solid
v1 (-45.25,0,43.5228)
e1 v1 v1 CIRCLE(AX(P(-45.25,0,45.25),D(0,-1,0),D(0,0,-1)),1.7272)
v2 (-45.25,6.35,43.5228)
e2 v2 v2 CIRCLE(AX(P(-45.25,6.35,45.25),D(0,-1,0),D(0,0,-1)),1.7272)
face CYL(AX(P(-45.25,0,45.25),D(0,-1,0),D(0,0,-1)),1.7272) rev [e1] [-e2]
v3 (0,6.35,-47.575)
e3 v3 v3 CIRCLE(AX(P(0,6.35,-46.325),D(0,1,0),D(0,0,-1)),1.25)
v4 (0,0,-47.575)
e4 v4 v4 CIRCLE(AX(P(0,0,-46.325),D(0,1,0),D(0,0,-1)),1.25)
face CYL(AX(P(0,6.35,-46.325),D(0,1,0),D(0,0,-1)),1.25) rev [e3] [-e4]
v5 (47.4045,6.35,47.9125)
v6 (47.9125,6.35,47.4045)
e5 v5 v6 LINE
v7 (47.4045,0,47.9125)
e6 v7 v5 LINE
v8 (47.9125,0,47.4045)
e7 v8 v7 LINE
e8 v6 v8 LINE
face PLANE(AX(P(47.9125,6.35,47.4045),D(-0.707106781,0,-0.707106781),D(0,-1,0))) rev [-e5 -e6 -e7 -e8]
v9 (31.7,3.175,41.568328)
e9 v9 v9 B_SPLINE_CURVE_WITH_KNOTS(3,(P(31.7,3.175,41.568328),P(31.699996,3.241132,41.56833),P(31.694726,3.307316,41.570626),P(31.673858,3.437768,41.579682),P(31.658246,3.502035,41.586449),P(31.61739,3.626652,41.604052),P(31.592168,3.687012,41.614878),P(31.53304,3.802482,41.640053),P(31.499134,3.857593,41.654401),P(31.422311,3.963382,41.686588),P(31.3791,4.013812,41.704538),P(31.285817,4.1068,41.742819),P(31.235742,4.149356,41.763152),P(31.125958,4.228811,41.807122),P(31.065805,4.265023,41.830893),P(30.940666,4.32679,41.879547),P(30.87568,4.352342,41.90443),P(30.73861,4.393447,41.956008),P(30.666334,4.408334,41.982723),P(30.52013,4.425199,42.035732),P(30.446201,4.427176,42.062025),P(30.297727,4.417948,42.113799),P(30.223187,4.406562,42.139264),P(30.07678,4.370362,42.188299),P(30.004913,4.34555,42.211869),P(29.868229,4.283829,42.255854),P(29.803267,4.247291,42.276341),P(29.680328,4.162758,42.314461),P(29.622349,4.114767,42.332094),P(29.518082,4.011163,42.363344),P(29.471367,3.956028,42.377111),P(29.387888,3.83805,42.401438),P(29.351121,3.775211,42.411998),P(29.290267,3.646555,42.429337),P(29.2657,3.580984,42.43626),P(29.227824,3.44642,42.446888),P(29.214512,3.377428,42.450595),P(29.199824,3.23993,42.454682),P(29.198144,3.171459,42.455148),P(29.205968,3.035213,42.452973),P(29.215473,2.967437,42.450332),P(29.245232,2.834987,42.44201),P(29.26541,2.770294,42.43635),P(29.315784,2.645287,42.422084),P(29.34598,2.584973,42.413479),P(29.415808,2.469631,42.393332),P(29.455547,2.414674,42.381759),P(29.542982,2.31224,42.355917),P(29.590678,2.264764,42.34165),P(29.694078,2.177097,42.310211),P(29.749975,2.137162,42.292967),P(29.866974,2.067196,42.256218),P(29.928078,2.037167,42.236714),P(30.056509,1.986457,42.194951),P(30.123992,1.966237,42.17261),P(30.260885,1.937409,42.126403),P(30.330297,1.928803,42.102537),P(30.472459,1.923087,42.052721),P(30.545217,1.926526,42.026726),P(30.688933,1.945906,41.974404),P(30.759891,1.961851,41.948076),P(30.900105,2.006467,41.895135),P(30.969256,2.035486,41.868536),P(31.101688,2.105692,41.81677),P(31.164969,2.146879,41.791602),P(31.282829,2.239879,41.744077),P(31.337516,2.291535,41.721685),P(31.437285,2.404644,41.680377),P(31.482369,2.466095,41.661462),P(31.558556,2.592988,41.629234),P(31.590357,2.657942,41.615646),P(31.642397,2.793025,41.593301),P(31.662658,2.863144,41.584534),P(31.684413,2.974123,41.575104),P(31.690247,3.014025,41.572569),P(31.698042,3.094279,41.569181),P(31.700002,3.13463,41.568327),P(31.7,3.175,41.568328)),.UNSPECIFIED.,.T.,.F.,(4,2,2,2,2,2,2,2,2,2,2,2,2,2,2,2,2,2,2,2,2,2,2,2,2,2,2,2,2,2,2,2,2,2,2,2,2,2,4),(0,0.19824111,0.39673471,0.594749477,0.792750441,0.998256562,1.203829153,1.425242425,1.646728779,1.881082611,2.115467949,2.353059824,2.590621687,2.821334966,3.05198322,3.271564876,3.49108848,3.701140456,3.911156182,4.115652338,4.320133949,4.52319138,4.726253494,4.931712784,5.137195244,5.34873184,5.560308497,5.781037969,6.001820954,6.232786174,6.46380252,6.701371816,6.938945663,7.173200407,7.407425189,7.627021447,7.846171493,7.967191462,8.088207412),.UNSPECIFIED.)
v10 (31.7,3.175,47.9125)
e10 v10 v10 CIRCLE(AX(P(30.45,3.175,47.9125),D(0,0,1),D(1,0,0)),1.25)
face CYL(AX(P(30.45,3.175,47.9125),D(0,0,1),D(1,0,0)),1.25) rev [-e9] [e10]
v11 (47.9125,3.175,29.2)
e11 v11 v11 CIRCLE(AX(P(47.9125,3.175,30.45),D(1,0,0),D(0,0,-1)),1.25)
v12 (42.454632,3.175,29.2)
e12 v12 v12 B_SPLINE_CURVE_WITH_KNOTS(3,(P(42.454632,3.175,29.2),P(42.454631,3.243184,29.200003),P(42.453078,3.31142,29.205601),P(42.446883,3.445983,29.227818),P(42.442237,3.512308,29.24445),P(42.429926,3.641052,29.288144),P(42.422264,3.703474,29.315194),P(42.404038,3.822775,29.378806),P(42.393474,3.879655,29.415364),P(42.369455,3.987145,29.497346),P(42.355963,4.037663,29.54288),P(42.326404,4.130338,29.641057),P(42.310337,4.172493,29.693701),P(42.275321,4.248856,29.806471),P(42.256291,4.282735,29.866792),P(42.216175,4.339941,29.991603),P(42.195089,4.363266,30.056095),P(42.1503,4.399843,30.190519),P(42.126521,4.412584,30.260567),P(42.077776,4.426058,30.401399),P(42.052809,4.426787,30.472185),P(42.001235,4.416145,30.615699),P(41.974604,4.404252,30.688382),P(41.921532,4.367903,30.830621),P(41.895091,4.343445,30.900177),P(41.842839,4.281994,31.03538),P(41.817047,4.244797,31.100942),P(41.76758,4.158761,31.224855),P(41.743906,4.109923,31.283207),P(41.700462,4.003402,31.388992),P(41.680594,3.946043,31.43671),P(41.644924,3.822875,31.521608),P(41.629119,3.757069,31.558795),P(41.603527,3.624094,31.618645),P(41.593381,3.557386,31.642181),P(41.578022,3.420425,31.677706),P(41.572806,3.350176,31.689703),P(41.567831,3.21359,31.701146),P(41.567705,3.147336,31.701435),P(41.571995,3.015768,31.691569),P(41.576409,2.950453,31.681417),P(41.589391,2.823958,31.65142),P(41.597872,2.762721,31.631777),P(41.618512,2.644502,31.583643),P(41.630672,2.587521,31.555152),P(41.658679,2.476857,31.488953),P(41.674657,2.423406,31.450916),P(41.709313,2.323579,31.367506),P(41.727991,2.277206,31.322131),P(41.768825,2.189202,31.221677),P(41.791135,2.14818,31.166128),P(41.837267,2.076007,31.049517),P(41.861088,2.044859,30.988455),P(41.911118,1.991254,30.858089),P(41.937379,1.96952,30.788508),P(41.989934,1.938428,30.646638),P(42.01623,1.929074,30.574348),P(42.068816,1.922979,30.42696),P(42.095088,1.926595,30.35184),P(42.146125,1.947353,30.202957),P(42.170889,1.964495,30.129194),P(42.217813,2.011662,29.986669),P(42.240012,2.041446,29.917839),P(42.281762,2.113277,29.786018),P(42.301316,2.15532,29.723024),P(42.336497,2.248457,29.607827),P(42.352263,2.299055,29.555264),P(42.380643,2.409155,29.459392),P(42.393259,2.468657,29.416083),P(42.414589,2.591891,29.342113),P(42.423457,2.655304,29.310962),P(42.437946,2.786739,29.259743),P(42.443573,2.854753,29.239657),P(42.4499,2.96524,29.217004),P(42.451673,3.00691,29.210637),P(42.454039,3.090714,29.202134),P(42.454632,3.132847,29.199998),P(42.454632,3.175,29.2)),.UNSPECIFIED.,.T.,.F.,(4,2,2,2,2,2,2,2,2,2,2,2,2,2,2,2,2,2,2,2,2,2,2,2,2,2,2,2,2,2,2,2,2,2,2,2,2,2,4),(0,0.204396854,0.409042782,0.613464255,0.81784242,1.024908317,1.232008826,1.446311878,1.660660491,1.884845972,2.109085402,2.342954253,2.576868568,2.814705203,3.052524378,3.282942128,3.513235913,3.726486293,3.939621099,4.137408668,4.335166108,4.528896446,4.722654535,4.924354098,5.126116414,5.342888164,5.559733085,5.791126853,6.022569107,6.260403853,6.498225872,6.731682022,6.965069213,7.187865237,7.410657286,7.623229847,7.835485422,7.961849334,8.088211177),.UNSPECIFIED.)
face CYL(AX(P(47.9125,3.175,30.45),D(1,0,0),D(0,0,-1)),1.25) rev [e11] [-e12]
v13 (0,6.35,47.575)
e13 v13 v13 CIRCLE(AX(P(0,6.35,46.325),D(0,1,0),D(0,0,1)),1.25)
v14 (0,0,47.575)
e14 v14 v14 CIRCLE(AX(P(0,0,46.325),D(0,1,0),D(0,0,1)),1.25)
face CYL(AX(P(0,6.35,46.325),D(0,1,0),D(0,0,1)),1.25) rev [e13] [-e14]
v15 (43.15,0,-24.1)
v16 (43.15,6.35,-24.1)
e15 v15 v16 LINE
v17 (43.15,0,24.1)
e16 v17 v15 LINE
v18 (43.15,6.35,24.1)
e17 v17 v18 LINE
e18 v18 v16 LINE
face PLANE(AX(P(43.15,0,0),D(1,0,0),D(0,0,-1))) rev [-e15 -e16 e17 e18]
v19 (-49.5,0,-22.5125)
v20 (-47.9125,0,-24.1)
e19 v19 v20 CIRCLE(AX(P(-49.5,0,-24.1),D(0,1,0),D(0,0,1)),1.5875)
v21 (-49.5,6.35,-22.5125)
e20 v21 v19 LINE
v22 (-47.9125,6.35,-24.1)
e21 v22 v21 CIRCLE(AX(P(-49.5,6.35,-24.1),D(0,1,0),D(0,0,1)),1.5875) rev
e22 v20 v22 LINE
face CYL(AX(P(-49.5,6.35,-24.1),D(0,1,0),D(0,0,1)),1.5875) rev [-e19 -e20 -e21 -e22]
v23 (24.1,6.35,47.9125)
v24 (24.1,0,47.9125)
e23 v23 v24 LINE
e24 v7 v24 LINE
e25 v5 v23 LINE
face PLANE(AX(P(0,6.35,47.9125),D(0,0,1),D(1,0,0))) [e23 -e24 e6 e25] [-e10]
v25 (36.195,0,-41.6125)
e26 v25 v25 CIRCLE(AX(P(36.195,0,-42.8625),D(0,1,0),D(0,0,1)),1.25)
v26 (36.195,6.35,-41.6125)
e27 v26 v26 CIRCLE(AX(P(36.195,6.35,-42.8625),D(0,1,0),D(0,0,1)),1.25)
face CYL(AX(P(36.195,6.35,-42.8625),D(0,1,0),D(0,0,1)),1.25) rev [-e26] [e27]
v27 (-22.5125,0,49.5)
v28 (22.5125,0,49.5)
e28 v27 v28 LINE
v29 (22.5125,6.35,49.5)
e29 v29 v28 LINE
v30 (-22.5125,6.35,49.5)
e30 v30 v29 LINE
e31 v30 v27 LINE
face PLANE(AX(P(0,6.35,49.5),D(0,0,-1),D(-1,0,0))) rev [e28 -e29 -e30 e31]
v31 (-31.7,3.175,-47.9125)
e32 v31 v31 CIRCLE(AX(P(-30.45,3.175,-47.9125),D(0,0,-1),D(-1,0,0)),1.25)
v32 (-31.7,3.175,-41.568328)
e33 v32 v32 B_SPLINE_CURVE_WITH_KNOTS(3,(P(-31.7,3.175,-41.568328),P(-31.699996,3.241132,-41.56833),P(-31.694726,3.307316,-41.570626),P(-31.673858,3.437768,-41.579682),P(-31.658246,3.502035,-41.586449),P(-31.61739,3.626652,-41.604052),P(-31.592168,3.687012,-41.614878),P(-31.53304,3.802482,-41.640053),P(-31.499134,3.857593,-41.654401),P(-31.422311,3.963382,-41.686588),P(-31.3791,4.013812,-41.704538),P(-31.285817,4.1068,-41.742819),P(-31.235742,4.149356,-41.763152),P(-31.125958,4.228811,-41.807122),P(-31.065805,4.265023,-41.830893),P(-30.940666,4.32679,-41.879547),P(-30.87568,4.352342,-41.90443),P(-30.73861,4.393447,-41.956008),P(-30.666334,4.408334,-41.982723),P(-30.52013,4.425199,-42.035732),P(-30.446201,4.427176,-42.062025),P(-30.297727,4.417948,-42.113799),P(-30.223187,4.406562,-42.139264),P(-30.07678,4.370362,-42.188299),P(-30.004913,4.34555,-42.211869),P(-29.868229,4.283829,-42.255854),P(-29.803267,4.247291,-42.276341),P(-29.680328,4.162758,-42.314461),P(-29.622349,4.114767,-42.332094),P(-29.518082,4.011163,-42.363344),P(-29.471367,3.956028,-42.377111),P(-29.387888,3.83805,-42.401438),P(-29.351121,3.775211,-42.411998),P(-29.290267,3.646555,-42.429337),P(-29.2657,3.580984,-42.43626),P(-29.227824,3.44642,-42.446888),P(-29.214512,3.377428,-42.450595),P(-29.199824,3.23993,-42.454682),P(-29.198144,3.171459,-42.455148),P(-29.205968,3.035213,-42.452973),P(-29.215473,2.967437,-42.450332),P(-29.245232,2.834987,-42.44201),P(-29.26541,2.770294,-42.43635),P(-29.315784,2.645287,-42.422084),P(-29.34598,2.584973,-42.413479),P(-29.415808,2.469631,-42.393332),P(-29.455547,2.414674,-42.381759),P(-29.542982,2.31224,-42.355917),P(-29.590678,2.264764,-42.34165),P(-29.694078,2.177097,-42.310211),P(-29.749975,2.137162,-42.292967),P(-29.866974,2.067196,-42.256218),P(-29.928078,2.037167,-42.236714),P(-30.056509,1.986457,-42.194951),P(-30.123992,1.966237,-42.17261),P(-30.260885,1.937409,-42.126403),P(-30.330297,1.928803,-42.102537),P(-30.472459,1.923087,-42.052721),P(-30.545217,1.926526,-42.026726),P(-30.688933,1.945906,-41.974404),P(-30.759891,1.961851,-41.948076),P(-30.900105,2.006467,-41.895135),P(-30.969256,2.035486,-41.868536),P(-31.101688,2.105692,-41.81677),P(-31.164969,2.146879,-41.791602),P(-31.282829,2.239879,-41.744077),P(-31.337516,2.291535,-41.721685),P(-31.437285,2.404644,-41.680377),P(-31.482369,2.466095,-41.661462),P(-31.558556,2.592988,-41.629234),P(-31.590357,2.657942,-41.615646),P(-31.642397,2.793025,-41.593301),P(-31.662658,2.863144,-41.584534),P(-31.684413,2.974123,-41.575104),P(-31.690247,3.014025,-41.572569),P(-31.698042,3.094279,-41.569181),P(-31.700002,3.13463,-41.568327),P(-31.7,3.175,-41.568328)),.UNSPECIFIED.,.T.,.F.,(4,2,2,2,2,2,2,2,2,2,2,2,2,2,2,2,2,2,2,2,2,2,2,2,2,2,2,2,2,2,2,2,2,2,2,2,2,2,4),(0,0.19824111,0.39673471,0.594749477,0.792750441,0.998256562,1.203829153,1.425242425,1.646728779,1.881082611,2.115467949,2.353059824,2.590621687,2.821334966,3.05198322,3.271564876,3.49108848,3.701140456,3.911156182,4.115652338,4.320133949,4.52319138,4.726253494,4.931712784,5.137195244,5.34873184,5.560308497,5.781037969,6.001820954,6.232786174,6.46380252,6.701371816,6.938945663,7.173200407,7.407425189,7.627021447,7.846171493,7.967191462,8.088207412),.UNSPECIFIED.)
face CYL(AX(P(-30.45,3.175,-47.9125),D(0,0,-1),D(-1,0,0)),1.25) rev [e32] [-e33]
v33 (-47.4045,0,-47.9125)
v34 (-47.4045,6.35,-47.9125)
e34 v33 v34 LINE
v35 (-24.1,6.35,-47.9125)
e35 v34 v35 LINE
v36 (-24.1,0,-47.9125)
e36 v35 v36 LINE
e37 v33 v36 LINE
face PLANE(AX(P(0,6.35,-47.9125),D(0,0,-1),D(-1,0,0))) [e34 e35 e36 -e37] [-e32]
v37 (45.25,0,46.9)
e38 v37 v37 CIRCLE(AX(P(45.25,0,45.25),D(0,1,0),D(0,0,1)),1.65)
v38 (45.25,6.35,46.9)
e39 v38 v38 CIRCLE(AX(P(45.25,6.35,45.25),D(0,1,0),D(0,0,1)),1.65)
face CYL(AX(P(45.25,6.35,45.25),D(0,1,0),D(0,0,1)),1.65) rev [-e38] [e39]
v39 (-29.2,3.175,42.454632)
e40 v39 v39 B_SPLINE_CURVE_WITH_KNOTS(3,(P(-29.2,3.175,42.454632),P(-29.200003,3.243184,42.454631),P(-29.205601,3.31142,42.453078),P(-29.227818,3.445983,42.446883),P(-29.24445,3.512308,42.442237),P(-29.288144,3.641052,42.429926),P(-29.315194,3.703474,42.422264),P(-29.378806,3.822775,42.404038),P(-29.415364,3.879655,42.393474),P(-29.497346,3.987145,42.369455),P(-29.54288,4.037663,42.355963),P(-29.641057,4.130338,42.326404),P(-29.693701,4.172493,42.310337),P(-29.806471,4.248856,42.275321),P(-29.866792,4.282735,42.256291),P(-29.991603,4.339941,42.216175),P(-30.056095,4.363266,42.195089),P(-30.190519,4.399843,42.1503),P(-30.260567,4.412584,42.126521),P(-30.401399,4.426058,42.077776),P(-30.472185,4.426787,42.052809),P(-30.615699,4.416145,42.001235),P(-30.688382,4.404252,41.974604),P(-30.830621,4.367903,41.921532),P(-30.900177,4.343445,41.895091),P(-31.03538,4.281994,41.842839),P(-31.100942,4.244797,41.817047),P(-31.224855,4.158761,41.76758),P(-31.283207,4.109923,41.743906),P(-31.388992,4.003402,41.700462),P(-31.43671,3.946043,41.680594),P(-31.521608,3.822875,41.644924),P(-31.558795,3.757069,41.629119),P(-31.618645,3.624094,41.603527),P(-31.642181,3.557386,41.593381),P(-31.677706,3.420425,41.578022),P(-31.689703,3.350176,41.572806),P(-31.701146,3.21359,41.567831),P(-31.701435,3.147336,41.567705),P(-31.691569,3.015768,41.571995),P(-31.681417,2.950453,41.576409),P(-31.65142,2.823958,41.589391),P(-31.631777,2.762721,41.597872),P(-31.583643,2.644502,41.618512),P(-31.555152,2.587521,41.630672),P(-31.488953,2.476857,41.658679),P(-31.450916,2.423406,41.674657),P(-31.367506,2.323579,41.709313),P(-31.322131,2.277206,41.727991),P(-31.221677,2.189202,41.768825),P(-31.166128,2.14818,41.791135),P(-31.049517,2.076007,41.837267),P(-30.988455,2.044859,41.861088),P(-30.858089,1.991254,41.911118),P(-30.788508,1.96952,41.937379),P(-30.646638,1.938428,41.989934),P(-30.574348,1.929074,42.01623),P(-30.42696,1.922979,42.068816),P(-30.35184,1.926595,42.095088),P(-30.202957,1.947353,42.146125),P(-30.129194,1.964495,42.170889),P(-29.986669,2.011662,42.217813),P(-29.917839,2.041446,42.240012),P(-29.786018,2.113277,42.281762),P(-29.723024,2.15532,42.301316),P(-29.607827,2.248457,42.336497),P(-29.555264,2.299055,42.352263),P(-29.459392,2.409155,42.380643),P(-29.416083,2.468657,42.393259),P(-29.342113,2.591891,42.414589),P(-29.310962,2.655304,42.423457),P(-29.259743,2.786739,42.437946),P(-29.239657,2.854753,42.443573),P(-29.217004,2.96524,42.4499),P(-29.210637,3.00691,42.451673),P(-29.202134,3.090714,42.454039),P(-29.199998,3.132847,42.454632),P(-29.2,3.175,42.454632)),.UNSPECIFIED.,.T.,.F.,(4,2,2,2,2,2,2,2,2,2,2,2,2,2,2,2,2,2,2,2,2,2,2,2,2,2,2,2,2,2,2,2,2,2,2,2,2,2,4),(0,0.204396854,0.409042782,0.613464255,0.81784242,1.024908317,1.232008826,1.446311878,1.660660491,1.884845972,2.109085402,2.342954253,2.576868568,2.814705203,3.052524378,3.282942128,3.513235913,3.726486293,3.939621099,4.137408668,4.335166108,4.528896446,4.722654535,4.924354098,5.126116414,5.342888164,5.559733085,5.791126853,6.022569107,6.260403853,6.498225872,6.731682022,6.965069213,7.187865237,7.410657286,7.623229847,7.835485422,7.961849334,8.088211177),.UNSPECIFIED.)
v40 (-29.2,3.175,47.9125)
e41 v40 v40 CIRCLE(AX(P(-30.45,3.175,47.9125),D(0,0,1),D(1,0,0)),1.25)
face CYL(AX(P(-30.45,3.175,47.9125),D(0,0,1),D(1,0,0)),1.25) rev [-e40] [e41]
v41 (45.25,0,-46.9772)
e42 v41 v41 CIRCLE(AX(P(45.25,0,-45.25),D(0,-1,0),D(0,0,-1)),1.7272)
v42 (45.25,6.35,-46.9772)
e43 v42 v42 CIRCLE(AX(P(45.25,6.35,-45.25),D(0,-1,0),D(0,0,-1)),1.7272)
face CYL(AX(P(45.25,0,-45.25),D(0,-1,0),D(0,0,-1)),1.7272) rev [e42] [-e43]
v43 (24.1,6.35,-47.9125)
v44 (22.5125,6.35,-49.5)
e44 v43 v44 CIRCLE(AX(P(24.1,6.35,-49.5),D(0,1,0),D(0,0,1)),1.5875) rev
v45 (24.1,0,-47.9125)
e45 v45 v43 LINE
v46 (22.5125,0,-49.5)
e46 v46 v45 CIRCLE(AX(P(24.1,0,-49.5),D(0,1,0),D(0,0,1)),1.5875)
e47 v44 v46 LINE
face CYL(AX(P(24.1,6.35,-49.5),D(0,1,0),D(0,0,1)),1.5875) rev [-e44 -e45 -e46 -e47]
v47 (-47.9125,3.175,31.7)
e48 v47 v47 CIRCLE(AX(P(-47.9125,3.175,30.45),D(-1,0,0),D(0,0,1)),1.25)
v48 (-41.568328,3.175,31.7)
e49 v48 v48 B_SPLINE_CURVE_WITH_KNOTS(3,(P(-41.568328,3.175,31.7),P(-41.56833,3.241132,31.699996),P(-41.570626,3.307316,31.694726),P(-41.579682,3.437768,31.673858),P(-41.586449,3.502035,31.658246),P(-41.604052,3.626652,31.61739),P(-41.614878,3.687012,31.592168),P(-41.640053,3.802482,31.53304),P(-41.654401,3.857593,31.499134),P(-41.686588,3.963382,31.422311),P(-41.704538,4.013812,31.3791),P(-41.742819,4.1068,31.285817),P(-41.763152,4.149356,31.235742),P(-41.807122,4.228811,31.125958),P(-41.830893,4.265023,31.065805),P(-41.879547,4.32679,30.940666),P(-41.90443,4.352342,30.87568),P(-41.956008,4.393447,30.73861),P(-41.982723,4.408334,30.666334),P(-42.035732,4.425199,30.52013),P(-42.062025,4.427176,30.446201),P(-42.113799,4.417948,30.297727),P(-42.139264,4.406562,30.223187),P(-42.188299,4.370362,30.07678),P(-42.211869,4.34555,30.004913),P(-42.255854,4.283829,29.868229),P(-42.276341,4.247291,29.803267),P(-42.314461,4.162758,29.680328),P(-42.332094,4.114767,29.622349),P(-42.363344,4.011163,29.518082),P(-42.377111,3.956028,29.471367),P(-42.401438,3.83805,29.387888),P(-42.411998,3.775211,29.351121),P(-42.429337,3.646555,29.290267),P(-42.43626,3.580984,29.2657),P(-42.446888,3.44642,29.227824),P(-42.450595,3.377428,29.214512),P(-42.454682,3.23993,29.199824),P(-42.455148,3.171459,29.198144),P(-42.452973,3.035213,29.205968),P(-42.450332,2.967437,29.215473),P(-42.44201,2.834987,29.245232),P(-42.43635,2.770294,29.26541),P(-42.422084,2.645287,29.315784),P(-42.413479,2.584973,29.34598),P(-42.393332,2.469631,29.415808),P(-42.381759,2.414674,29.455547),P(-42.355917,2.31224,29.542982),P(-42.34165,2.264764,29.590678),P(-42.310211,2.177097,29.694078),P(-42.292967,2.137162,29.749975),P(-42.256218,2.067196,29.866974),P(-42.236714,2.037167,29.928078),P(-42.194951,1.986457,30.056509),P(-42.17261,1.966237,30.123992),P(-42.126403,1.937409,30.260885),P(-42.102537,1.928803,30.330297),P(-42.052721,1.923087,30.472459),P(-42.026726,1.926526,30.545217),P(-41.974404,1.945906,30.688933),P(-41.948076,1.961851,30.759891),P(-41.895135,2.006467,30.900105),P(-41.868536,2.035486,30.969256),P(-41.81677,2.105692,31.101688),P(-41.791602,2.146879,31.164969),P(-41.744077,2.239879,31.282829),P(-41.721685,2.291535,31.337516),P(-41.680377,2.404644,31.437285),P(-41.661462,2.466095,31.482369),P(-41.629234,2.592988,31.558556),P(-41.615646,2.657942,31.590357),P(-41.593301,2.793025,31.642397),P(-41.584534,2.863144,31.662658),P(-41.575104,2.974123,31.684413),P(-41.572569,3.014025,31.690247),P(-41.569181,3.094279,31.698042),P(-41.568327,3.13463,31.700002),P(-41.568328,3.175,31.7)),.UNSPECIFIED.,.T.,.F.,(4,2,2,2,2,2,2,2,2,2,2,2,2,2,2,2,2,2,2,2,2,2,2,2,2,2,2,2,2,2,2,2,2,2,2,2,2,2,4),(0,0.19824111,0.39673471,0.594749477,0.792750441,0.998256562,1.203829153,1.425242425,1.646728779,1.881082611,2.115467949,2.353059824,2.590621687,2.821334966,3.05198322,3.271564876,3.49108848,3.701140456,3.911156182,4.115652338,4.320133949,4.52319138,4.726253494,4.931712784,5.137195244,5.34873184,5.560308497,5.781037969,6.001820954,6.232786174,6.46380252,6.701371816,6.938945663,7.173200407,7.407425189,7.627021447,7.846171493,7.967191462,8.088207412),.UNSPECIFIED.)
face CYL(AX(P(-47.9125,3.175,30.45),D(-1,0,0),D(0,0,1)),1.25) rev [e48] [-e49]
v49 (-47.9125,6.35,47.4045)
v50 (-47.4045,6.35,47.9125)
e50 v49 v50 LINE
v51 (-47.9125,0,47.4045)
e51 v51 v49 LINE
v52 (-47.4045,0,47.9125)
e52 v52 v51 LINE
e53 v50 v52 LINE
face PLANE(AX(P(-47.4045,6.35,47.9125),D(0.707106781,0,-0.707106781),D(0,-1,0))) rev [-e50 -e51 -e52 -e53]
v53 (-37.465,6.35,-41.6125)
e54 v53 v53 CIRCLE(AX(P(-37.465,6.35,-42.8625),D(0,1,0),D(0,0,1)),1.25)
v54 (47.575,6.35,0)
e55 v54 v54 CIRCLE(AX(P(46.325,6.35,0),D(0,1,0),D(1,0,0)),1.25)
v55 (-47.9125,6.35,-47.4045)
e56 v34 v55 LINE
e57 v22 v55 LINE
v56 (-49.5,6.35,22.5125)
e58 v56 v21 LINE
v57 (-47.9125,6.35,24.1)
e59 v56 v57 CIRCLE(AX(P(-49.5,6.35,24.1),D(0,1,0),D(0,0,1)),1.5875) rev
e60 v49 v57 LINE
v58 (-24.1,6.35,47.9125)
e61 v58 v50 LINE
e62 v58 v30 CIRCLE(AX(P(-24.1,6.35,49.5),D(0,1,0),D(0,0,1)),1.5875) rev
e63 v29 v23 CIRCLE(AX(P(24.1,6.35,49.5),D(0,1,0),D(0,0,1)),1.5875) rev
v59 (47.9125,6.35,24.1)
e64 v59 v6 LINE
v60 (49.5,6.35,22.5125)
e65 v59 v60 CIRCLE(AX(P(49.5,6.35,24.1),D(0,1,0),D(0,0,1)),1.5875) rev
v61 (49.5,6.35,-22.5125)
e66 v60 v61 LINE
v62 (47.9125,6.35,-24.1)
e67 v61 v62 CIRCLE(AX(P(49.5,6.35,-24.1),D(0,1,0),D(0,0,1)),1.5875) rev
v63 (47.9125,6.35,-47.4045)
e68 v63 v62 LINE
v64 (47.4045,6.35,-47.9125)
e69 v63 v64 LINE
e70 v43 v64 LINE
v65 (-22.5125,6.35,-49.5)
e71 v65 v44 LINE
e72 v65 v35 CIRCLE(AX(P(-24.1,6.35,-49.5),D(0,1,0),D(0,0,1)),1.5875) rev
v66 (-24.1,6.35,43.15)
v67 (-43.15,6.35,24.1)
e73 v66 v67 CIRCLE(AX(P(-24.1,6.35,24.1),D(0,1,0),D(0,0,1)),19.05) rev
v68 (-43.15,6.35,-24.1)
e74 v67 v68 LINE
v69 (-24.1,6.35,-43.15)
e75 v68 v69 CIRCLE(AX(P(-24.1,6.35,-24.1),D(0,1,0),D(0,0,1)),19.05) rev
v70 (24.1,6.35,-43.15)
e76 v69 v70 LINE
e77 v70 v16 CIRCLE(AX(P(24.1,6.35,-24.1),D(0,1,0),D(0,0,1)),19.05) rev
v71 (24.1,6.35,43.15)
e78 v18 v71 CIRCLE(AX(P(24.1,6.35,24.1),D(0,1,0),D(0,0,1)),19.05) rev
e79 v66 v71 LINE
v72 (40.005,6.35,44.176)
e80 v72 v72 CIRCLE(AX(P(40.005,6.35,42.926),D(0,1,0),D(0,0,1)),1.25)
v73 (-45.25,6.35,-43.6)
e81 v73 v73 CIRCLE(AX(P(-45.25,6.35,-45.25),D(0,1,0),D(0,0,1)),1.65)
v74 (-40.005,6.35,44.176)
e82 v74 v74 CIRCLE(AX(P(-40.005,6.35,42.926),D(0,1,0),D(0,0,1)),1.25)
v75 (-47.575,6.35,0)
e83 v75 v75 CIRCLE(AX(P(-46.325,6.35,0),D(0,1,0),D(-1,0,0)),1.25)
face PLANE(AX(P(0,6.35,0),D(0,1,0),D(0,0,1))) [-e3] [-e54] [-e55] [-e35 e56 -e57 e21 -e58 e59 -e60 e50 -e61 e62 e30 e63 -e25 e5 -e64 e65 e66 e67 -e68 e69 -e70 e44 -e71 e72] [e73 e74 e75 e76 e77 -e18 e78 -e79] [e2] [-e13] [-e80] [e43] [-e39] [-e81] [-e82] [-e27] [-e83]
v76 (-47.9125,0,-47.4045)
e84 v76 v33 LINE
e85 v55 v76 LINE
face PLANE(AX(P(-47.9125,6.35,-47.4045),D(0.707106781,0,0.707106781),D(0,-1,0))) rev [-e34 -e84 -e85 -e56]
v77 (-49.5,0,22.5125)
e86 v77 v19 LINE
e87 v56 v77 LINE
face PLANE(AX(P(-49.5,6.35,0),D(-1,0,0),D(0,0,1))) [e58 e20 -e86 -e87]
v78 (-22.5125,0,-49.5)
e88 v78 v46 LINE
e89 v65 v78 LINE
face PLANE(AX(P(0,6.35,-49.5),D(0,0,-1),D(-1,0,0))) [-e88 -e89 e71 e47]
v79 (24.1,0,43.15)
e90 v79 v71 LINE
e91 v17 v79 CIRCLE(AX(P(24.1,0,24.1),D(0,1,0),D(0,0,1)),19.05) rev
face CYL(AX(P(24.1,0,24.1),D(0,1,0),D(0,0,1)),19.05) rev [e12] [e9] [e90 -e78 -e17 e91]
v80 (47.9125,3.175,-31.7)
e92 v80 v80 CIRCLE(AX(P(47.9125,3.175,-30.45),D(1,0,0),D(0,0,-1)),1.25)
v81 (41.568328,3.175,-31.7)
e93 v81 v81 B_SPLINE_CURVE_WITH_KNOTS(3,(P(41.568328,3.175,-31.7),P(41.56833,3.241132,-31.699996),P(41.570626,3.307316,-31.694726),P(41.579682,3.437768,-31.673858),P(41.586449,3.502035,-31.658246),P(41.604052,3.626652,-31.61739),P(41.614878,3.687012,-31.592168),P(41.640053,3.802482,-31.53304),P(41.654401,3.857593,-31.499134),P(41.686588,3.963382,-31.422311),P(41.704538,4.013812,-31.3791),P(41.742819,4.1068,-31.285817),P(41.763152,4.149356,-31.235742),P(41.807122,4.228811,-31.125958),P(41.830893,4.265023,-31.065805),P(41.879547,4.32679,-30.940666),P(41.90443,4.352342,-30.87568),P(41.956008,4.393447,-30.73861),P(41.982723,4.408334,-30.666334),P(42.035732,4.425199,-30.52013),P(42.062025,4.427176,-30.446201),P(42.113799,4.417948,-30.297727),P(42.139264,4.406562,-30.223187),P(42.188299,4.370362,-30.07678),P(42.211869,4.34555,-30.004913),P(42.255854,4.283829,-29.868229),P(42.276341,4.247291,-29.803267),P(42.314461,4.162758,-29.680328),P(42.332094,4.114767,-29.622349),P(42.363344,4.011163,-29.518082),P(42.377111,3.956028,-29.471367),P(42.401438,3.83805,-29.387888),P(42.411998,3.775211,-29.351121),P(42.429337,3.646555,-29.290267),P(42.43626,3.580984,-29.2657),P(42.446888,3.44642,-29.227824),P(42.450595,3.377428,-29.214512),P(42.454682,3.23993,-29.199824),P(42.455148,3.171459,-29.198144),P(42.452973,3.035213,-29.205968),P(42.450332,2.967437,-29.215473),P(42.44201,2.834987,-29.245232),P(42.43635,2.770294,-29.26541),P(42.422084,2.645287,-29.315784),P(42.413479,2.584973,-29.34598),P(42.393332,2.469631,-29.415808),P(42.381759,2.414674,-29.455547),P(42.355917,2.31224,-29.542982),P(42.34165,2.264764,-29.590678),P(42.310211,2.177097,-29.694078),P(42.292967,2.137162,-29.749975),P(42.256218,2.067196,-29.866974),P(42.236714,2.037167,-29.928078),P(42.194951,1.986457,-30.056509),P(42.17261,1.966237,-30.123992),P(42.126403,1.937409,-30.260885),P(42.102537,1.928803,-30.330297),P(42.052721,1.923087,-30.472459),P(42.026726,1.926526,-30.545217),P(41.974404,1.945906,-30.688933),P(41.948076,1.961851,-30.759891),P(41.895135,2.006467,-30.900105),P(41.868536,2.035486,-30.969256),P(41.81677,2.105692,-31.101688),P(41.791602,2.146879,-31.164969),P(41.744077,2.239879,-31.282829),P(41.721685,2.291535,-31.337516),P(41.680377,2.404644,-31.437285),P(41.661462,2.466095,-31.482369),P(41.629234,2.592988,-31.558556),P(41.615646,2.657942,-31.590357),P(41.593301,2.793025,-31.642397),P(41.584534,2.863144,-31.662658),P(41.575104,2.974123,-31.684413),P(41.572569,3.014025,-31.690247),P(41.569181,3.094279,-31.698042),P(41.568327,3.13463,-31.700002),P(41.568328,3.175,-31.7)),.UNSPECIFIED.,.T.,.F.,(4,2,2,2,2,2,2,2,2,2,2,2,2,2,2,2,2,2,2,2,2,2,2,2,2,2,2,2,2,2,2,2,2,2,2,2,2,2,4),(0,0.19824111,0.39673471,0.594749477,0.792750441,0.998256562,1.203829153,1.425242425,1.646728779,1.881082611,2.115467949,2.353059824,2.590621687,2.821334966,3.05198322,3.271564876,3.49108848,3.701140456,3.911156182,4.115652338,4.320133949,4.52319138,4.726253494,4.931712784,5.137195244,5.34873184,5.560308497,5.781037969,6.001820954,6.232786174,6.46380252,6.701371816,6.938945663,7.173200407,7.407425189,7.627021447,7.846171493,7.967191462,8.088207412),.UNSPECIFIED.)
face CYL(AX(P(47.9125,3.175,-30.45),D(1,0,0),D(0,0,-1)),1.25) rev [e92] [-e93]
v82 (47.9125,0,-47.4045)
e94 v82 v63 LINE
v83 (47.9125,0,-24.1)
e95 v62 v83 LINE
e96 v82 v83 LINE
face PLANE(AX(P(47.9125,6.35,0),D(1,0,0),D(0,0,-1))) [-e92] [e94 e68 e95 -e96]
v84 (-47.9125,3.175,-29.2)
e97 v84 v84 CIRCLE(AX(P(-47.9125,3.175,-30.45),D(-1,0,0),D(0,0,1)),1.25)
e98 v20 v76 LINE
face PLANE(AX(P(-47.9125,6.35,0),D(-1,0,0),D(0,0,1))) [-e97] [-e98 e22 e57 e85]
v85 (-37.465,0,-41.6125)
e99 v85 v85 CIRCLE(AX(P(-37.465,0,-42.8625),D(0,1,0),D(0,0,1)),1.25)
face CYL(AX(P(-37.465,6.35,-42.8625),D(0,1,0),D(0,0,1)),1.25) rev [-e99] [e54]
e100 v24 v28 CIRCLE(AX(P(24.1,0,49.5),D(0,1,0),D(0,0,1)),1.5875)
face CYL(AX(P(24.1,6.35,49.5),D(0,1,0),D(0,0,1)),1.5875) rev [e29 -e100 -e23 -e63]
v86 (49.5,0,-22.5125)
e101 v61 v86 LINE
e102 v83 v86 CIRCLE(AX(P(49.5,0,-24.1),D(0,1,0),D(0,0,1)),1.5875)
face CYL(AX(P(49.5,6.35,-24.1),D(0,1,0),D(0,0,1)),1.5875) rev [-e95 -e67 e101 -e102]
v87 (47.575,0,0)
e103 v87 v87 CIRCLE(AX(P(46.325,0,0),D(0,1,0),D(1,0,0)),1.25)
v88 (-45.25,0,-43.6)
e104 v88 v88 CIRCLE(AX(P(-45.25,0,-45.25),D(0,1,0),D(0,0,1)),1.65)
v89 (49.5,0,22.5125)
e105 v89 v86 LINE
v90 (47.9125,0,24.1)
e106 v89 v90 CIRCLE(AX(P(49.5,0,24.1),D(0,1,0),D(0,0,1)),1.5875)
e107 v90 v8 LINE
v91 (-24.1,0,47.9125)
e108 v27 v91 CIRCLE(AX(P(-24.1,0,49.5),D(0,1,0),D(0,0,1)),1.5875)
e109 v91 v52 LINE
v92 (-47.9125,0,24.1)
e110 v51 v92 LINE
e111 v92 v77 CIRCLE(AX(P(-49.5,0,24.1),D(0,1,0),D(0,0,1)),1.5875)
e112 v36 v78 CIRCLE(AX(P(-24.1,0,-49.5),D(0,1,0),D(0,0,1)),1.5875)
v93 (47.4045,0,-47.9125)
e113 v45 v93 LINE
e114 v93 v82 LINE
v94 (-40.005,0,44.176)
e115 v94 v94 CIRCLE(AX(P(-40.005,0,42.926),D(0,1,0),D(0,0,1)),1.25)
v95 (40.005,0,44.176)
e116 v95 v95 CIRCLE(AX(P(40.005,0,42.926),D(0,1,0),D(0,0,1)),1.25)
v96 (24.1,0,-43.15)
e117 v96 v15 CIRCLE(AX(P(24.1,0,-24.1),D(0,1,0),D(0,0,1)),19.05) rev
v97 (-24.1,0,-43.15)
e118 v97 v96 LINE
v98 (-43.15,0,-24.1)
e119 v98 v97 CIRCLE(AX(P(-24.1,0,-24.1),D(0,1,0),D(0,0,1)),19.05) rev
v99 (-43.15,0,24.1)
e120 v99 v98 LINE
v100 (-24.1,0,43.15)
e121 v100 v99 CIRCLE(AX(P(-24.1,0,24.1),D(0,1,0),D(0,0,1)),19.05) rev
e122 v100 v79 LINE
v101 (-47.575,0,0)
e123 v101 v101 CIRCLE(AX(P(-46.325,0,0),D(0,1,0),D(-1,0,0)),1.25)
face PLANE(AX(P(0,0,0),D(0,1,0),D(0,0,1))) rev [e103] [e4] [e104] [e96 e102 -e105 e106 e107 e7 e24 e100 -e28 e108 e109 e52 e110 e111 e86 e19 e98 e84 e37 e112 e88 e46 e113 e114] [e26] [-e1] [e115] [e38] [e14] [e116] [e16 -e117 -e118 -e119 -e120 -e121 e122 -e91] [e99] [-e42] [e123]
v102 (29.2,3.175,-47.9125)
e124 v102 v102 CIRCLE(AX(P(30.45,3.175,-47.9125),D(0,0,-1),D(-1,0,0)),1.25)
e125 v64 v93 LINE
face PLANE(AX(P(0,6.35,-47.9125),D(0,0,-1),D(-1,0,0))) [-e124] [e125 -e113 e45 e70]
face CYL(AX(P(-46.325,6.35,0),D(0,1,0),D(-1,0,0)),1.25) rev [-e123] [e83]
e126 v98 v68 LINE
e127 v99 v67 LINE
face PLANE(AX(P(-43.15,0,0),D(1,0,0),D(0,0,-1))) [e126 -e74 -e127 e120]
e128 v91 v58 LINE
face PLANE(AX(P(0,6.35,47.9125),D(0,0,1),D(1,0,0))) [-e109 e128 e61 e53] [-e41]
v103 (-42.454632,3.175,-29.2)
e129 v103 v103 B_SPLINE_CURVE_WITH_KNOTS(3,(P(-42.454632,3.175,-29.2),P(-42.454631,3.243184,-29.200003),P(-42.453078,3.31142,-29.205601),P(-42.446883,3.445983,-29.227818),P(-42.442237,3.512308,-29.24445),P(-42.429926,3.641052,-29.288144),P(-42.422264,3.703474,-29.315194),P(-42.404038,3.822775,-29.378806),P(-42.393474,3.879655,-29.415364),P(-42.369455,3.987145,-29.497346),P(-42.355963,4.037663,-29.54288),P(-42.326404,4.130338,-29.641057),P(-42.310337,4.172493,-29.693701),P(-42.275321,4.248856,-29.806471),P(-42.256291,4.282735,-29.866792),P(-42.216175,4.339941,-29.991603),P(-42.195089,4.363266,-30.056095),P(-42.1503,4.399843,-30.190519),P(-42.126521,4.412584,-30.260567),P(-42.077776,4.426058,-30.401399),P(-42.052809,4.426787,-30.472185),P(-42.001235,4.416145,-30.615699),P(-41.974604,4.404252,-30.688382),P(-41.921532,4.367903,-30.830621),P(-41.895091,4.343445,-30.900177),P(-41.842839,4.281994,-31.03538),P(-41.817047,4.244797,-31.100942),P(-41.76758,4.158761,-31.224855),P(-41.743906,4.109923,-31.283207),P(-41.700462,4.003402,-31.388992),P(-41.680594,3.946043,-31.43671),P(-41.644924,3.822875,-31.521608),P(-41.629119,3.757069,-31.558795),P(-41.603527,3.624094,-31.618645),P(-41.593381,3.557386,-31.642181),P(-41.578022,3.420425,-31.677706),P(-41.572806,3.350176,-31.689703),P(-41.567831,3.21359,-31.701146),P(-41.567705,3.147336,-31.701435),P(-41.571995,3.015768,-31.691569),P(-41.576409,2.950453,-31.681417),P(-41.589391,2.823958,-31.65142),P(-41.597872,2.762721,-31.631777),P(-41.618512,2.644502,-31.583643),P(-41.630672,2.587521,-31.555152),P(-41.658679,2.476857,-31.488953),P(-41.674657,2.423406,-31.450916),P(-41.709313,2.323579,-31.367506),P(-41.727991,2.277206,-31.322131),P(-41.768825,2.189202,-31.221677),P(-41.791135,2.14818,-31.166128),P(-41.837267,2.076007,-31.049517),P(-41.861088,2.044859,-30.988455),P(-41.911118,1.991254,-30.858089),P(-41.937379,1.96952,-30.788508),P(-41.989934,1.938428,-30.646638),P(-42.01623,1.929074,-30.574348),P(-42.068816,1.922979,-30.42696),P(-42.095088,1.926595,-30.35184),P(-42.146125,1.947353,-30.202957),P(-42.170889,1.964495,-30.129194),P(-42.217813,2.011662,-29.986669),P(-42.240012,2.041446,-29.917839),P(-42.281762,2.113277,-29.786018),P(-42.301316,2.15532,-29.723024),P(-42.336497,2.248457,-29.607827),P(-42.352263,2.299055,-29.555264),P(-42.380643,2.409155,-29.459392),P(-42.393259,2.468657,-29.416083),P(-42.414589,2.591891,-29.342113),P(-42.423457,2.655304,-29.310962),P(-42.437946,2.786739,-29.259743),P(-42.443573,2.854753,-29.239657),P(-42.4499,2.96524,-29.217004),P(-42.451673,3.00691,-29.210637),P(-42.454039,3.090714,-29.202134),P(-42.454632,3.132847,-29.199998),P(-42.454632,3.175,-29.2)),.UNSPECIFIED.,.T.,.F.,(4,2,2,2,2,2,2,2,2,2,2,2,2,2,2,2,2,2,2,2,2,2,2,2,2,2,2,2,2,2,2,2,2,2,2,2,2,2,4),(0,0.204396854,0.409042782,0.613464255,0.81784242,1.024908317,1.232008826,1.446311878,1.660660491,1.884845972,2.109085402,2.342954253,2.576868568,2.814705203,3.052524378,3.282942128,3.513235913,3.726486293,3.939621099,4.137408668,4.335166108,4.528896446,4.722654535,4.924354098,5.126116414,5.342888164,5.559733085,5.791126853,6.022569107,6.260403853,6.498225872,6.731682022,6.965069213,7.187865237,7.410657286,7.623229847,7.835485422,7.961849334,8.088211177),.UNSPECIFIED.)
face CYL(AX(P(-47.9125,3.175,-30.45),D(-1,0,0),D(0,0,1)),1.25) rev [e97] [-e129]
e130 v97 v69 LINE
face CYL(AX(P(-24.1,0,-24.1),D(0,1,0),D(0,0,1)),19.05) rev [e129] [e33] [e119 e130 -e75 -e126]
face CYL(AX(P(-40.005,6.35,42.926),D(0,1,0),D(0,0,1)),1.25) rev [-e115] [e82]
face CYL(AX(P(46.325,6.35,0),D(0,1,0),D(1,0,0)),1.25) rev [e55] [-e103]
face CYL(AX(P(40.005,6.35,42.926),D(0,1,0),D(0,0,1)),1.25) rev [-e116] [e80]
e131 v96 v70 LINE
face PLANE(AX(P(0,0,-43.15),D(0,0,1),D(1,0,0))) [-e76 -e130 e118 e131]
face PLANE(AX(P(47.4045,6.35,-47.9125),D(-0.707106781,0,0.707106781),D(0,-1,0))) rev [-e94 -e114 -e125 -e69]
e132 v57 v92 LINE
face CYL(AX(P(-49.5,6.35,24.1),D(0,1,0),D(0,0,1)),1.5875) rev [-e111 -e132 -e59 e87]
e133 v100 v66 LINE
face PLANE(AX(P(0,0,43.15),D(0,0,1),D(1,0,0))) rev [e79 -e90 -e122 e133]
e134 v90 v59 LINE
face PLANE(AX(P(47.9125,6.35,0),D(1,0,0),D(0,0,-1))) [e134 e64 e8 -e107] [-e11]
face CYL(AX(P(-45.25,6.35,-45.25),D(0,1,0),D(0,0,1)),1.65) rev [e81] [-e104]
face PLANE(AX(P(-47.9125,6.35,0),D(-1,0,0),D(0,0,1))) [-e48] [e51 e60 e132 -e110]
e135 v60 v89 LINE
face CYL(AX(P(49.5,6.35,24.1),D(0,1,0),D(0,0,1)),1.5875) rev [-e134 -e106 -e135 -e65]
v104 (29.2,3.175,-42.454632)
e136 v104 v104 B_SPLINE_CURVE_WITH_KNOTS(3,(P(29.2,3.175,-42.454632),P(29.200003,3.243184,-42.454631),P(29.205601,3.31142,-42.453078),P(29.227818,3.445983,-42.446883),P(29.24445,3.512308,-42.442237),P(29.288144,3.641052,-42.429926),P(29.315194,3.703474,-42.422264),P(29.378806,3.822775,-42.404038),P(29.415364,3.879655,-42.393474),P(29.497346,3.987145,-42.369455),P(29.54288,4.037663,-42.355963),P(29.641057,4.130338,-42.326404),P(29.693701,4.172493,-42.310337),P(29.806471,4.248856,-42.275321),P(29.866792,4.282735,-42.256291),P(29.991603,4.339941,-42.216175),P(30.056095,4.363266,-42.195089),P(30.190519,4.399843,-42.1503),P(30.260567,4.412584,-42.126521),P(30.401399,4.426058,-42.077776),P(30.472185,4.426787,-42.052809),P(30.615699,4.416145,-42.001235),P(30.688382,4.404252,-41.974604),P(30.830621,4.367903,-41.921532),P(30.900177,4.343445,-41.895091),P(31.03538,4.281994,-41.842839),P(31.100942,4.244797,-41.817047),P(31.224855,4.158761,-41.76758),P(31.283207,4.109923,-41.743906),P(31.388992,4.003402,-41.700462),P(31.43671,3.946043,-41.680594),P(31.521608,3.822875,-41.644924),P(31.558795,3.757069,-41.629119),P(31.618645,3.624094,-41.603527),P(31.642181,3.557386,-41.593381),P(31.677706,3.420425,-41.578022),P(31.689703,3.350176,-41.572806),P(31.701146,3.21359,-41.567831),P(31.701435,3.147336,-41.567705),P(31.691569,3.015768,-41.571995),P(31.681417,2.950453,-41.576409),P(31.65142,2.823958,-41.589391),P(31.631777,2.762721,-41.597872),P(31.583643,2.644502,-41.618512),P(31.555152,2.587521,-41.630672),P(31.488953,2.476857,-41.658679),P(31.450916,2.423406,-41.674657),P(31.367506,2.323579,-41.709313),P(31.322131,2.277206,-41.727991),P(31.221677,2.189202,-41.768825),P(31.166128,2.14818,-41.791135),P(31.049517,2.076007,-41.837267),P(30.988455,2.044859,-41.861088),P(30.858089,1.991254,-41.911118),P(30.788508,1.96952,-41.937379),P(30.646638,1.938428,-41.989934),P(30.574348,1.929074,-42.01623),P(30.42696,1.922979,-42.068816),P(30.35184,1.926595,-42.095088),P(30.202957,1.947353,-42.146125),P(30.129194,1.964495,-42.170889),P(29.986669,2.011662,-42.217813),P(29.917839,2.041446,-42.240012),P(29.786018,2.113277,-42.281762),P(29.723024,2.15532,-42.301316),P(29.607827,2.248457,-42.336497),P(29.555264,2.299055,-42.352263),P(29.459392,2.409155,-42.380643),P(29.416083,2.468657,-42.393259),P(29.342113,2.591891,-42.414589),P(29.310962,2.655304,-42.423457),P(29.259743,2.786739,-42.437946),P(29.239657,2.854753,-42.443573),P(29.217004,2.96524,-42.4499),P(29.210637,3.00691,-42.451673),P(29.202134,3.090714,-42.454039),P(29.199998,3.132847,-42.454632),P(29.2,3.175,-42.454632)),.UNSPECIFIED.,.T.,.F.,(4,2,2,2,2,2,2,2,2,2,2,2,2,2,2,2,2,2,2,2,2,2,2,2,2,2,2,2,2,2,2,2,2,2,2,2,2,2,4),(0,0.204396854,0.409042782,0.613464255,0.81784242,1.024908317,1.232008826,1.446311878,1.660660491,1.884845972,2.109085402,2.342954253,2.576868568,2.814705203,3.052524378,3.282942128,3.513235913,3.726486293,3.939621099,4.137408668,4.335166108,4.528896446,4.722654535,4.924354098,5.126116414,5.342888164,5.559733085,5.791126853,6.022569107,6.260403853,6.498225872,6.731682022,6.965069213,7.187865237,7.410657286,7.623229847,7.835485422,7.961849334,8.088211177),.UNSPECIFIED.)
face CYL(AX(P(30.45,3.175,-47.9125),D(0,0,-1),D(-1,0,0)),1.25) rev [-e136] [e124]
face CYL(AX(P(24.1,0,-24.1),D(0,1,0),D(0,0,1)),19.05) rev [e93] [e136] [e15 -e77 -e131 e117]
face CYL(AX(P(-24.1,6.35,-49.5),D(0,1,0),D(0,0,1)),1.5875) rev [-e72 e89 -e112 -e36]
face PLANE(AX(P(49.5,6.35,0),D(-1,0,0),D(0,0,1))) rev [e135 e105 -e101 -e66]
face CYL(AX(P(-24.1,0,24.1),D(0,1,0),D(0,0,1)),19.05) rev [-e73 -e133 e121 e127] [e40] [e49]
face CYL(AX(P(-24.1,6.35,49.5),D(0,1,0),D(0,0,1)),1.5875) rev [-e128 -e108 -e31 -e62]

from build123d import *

# Parameters (mm, degrees)
BOSS_EXTRUDE1_DEPTH            = 6.35
CHAMFER1_SIZE                  = 0.508
FILLET1_R                      = 1.5875
F_8_36_TAPPED_HOLE2_D          = 3.4544
M3X0_5_TAPPED_HOLE1_AT_2_COUNT = 2
M3X0_5_TAPPED_HOLE1_AT_2_PITCH = 60.9
CIRPATTERN1_COUNT              = 4
SKETCH9_R                      = 0.79375
CUT_EXTRUDE2_DEPTH             = 71.290984486
CUT_EXTRUDE3_DEPTH             = 71.290984486
CIRPATTERN2_COUNT              = 4
M4X0_7_TAPPED_HOLE1_D          = 3.3
M3X0_5_TAPPED_HOLE4_D          = 2.5


with BuildPart() as part:
    # Sketch1 → Boss-Extrude1 (new body)
    with BuildSketch(Plane(origin=(0, 0, 0), x_dir=(1, 0, 0), z_dir=(0, 1, 0))):
        Polygon((-47.9125, 22.5125), (-49.5, 22.5125), (-49.5, -22.5125), (-47.9125, -22.5125), (-47.9125, -47.9125), (-22.5125, -47.9125), (-22.5125, -49.5), (22.5125, -49.5), (22.5125, -47.9125), (47.9125, -47.9125), (47.9125, -22.5125), (49.5, -22.5125), (49.5, 22.5125), (47.9125, 22.5125), (47.9125, 47.9125), (22.5125, 47.9125), (22.5125, 49.5), (-22.5125, 49.5), (-22.5125, 47.9125), (-47.9125, 47.9125), align=None)
    extrude(amount=BOSS_EXTRUDE1_DEPTH)

    # Chamfer1
    chamfer1_edges = [part.edges().sort_by_distance(p)[0] for p in [
        (-47.9125, 3.175, -47.9125),
        (47.9125, 3.175, -47.9125),
        (47.9125, 3.175, 47.9125),
        (-47.9125, 3.175, 47.9125),
    ]]
    chamfer(chamfer1_edges, length=CHAMFER1_SIZE)

    # Fillet1
    fillet1_edges = [part.edges().sort_by_distance(p)[0] for p in [
        (-47.9125, 3.175, -22.5125),
        (-22.5125, 3.175, -47.9125),
        (22.5125, 3.175, -47.9125),
        (47.9125, 3.175, -22.5125),
        (47.9125, 3.175, 22.5125),
        (22.5125, 3.175, 47.9125),
        (-22.5125, 3.175, 47.9125),
        (-47.9125, 3.175, 22.5125),
    ]]
    fillet(fillet1_edges, radius=FILLET1_R - 0.0001)  # a hair under: the kernel refuses the full size

    # #8-36 Tapped Hole2 (through all)
    with Locations(Plane(origin=(0, 0, 0), x_dir=(-1, 0, 0), z_dir=(0, -1, 0))):
        with Locations((-45.25, 45.25), (45.25, -45.25)):
            Hole(F_8_36_TAPPED_HOLE2_D / 2)

    # Sketch7 → M3x0.5 Tapped Hole1 (revolve, cut)
    with BuildSketch(Plane(origin=(-30.45, 3.175, 47.9125), x_dir=(0, -1, 0), z_dir=(1, 0, 0))):
        Polygon((0, 0), (0, 8.371075774), (1.25, 7.62), (1.25, 0), align=None)
    m3x0_5_tapped_hole1 = revolve(axis=Axis((-30.45, 3.175, 54.2625), (0, 0, -1)), mode=Mode.SUBTRACT)

    # M3x0.5 Tapped Hole1 at 2: M3x0.5 Tapped Hole1 ×2
    with Locations(*[(i * M3X0_5_TAPPED_HOLE1_AT_2_PITCH, 0, 0) for i in range(1, M3X0_5_TAPPED_HOLE1_AT_2_COUNT)]):
        add(m3x0_5_tapped_hole1, mode=Mode.SUBTRACT)

    # CirPattern1: M3x0.5 Tapped Hole1 ×4 about axis
    cirpattern1_axis = Axis((0, -0.3175, 0), (0, 1, 0))
    for i in range(1, CIRPATTERN1_COUNT):
        add(m3x0_5_tapped_hole1.rotate(cirpattern1_axis, i * 360 / CIRPATTERN1_COUNT), mode=Mode.SUBTRACT)

    # CirPattern1 copy 1 sketch → CirPattern1 copy 1 (revolve, cut)
    with BuildSketch(Plane(origin=(47.9125, 3.175, -30.45), x_dir=(0, -1, 0), z_dir=(0, 0, -1))):
        Polygon((0, 0), (0, 8.371075774), (1.25, 7.62), (1.25, 0), align=None)
    revolve(axis=Axis((54.2625, 3.175, -30.45), (-1, 0, 0)), mode=Mode.SUBTRACT)

    # CirPattern1 copy 2 sketch → CirPattern1 copy 2 (revolve, cut)
    with BuildSketch(Plane(origin=(-30.45, 3.175, -47.9125), x_dir=(0, -1, 0), z_dir=(-1, 0, 0))):
        Polygon((0, 0), (0, 8.371075774), (1.25, 7.62), (1.25, 0), align=None)
    revolve(axis=Axis((-30.45, 3.175, -54.2625), (0, 0, 1)), mode=Mode.SUBTRACT)

    # CirPattern1 copy 3 sketch → CirPattern1 copy 3 (revolve, cut)
    with BuildSketch(Plane(origin=(-47.9125, 3.175, 30.45), x_dir=(0, -1, 0), z_dir=(0, 0, 1))):
        Polygon((0, 0), (0, 8.371075774), (1.25, 7.62), (1.25, 0), align=None)
    revolve(axis=Axis((-54.2625, 3.175, 30.45), (1, 0, 0)), mode=Mode.SUBTRACT)

    # Sketch9 → Cut-Extrude2 (cut, through all)
    with BuildSketch(Plane(origin=(0, 6.35, 0), x_dir=(1, 0, 0), z_dir=(0, 1, 0))):
        with Locations(Location((-40.005, -42.926, 0), (0, 0, 270))):
            Circle(SKETCH9_R)
        with Locations(Location((40.005, -42.926, 0), (0, 0, 270))):
            Circle(SKETCH9_R)
        with Locations(Location((36.195, 42.8625, 0), (0, 0, 270))):
            Circle(SKETCH9_R)
        with Locations(Location((-37.465, 42.8625, 0), (0, 0, 270))):
            Circle(SKETCH9_R)
    extrude(amount=-CUT_EXTRUDE2_DEPTH, mode=Mode.SUBTRACT)

    # Sketch15 → M3x0.5 Tapped Hole3 (revolve, cut)
    with BuildSketch(Plane(origin=(0, 6.35, 46.325), x_dir=(0, 0, 1), z_dir=(1, 0, 0))):
        Polygon((0, 0), (0, 8.371075774), (1.25, 7.62), (1.25, 0), align=None)
    m3x0_5_tapped_hole3 = revolve(axis=Axis((0, 12.7, 46.325), (0, -1, 0)), mode=Mode.SUBTRACT)

    # Sketch16 → Cut-Extrude3 (cut, through all)
    with BuildSketch(Plane(origin=(0, 6.35, 0), x_dir=(1, 0, 0), z_dir=(0, 1, 0))):
        with BuildLine():
            ThreePointArc((-43.15, -24.1), (-37.570384182, -37.570384182), (-24.1, -43.15))
            Line((-24.1, -43.15), (24.1, -43.15))
            ThreePointArc((24.1, -43.15), (37.570384182, -37.570384182), (43.15, -24.1))
            Line((43.15, -24.1), (43.15, 24.1))
            ThreePointArc((43.15, 24.1), (37.570384182, 37.570384182), (24.1, 43.15))
            Line((24.1, 43.15), (-24.1, 43.15))
            ThreePointArc((-24.1, 43.15), (-37.570384182, 37.570384182), (-43.15, 24.1))
            Line((-43.15, 24.1), (-43.15, -24.1))
        make_face()
    extrude(amount=-CUT_EXTRUDE3_DEPTH, mode=Mode.SUBTRACT)

    # CirPattern2: M3x0.5 Tapped Hole3 ×4 about axis
    cirpattern2_axis = Axis((0, 0, 0), (0, 1, 0))
    for i in range(1, CIRPATTERN2_COUNT):
        add(m3x0_5_tapped_hole3.rotate(cirpattern2_axis, i * 360 / CIRPATTERN2_COUNT), mode=Mode.SUBTRACT)

    # M4x0.7 Tapped Hole1 (through all)
    with Locations(Plane(origin=(0, 6.35, 0), x_dir=(1, 0, 0), z_dir=(0, 1, 0))):
        with Locations((-45.25, 45.25), (45.25, -45.25)):
            Hole(M4X0_7_TAPPED_HOLE1_D / 2)

    # M3x0.5 Tapped Hole4 (through all)
    with Locations(Plane(origin=(0, 6.35, 0), x_dir=(1, 0, 0), z_dir=(0, 1, 0))):
        with Locations((36.195, 42.8625), (-37.465, 42.8625), (-40.005, -42.926), (40.005, -42.926)):
            Hole(M3X0_5_TAPPED_HOLE4_D / 2)


solid = part.part
